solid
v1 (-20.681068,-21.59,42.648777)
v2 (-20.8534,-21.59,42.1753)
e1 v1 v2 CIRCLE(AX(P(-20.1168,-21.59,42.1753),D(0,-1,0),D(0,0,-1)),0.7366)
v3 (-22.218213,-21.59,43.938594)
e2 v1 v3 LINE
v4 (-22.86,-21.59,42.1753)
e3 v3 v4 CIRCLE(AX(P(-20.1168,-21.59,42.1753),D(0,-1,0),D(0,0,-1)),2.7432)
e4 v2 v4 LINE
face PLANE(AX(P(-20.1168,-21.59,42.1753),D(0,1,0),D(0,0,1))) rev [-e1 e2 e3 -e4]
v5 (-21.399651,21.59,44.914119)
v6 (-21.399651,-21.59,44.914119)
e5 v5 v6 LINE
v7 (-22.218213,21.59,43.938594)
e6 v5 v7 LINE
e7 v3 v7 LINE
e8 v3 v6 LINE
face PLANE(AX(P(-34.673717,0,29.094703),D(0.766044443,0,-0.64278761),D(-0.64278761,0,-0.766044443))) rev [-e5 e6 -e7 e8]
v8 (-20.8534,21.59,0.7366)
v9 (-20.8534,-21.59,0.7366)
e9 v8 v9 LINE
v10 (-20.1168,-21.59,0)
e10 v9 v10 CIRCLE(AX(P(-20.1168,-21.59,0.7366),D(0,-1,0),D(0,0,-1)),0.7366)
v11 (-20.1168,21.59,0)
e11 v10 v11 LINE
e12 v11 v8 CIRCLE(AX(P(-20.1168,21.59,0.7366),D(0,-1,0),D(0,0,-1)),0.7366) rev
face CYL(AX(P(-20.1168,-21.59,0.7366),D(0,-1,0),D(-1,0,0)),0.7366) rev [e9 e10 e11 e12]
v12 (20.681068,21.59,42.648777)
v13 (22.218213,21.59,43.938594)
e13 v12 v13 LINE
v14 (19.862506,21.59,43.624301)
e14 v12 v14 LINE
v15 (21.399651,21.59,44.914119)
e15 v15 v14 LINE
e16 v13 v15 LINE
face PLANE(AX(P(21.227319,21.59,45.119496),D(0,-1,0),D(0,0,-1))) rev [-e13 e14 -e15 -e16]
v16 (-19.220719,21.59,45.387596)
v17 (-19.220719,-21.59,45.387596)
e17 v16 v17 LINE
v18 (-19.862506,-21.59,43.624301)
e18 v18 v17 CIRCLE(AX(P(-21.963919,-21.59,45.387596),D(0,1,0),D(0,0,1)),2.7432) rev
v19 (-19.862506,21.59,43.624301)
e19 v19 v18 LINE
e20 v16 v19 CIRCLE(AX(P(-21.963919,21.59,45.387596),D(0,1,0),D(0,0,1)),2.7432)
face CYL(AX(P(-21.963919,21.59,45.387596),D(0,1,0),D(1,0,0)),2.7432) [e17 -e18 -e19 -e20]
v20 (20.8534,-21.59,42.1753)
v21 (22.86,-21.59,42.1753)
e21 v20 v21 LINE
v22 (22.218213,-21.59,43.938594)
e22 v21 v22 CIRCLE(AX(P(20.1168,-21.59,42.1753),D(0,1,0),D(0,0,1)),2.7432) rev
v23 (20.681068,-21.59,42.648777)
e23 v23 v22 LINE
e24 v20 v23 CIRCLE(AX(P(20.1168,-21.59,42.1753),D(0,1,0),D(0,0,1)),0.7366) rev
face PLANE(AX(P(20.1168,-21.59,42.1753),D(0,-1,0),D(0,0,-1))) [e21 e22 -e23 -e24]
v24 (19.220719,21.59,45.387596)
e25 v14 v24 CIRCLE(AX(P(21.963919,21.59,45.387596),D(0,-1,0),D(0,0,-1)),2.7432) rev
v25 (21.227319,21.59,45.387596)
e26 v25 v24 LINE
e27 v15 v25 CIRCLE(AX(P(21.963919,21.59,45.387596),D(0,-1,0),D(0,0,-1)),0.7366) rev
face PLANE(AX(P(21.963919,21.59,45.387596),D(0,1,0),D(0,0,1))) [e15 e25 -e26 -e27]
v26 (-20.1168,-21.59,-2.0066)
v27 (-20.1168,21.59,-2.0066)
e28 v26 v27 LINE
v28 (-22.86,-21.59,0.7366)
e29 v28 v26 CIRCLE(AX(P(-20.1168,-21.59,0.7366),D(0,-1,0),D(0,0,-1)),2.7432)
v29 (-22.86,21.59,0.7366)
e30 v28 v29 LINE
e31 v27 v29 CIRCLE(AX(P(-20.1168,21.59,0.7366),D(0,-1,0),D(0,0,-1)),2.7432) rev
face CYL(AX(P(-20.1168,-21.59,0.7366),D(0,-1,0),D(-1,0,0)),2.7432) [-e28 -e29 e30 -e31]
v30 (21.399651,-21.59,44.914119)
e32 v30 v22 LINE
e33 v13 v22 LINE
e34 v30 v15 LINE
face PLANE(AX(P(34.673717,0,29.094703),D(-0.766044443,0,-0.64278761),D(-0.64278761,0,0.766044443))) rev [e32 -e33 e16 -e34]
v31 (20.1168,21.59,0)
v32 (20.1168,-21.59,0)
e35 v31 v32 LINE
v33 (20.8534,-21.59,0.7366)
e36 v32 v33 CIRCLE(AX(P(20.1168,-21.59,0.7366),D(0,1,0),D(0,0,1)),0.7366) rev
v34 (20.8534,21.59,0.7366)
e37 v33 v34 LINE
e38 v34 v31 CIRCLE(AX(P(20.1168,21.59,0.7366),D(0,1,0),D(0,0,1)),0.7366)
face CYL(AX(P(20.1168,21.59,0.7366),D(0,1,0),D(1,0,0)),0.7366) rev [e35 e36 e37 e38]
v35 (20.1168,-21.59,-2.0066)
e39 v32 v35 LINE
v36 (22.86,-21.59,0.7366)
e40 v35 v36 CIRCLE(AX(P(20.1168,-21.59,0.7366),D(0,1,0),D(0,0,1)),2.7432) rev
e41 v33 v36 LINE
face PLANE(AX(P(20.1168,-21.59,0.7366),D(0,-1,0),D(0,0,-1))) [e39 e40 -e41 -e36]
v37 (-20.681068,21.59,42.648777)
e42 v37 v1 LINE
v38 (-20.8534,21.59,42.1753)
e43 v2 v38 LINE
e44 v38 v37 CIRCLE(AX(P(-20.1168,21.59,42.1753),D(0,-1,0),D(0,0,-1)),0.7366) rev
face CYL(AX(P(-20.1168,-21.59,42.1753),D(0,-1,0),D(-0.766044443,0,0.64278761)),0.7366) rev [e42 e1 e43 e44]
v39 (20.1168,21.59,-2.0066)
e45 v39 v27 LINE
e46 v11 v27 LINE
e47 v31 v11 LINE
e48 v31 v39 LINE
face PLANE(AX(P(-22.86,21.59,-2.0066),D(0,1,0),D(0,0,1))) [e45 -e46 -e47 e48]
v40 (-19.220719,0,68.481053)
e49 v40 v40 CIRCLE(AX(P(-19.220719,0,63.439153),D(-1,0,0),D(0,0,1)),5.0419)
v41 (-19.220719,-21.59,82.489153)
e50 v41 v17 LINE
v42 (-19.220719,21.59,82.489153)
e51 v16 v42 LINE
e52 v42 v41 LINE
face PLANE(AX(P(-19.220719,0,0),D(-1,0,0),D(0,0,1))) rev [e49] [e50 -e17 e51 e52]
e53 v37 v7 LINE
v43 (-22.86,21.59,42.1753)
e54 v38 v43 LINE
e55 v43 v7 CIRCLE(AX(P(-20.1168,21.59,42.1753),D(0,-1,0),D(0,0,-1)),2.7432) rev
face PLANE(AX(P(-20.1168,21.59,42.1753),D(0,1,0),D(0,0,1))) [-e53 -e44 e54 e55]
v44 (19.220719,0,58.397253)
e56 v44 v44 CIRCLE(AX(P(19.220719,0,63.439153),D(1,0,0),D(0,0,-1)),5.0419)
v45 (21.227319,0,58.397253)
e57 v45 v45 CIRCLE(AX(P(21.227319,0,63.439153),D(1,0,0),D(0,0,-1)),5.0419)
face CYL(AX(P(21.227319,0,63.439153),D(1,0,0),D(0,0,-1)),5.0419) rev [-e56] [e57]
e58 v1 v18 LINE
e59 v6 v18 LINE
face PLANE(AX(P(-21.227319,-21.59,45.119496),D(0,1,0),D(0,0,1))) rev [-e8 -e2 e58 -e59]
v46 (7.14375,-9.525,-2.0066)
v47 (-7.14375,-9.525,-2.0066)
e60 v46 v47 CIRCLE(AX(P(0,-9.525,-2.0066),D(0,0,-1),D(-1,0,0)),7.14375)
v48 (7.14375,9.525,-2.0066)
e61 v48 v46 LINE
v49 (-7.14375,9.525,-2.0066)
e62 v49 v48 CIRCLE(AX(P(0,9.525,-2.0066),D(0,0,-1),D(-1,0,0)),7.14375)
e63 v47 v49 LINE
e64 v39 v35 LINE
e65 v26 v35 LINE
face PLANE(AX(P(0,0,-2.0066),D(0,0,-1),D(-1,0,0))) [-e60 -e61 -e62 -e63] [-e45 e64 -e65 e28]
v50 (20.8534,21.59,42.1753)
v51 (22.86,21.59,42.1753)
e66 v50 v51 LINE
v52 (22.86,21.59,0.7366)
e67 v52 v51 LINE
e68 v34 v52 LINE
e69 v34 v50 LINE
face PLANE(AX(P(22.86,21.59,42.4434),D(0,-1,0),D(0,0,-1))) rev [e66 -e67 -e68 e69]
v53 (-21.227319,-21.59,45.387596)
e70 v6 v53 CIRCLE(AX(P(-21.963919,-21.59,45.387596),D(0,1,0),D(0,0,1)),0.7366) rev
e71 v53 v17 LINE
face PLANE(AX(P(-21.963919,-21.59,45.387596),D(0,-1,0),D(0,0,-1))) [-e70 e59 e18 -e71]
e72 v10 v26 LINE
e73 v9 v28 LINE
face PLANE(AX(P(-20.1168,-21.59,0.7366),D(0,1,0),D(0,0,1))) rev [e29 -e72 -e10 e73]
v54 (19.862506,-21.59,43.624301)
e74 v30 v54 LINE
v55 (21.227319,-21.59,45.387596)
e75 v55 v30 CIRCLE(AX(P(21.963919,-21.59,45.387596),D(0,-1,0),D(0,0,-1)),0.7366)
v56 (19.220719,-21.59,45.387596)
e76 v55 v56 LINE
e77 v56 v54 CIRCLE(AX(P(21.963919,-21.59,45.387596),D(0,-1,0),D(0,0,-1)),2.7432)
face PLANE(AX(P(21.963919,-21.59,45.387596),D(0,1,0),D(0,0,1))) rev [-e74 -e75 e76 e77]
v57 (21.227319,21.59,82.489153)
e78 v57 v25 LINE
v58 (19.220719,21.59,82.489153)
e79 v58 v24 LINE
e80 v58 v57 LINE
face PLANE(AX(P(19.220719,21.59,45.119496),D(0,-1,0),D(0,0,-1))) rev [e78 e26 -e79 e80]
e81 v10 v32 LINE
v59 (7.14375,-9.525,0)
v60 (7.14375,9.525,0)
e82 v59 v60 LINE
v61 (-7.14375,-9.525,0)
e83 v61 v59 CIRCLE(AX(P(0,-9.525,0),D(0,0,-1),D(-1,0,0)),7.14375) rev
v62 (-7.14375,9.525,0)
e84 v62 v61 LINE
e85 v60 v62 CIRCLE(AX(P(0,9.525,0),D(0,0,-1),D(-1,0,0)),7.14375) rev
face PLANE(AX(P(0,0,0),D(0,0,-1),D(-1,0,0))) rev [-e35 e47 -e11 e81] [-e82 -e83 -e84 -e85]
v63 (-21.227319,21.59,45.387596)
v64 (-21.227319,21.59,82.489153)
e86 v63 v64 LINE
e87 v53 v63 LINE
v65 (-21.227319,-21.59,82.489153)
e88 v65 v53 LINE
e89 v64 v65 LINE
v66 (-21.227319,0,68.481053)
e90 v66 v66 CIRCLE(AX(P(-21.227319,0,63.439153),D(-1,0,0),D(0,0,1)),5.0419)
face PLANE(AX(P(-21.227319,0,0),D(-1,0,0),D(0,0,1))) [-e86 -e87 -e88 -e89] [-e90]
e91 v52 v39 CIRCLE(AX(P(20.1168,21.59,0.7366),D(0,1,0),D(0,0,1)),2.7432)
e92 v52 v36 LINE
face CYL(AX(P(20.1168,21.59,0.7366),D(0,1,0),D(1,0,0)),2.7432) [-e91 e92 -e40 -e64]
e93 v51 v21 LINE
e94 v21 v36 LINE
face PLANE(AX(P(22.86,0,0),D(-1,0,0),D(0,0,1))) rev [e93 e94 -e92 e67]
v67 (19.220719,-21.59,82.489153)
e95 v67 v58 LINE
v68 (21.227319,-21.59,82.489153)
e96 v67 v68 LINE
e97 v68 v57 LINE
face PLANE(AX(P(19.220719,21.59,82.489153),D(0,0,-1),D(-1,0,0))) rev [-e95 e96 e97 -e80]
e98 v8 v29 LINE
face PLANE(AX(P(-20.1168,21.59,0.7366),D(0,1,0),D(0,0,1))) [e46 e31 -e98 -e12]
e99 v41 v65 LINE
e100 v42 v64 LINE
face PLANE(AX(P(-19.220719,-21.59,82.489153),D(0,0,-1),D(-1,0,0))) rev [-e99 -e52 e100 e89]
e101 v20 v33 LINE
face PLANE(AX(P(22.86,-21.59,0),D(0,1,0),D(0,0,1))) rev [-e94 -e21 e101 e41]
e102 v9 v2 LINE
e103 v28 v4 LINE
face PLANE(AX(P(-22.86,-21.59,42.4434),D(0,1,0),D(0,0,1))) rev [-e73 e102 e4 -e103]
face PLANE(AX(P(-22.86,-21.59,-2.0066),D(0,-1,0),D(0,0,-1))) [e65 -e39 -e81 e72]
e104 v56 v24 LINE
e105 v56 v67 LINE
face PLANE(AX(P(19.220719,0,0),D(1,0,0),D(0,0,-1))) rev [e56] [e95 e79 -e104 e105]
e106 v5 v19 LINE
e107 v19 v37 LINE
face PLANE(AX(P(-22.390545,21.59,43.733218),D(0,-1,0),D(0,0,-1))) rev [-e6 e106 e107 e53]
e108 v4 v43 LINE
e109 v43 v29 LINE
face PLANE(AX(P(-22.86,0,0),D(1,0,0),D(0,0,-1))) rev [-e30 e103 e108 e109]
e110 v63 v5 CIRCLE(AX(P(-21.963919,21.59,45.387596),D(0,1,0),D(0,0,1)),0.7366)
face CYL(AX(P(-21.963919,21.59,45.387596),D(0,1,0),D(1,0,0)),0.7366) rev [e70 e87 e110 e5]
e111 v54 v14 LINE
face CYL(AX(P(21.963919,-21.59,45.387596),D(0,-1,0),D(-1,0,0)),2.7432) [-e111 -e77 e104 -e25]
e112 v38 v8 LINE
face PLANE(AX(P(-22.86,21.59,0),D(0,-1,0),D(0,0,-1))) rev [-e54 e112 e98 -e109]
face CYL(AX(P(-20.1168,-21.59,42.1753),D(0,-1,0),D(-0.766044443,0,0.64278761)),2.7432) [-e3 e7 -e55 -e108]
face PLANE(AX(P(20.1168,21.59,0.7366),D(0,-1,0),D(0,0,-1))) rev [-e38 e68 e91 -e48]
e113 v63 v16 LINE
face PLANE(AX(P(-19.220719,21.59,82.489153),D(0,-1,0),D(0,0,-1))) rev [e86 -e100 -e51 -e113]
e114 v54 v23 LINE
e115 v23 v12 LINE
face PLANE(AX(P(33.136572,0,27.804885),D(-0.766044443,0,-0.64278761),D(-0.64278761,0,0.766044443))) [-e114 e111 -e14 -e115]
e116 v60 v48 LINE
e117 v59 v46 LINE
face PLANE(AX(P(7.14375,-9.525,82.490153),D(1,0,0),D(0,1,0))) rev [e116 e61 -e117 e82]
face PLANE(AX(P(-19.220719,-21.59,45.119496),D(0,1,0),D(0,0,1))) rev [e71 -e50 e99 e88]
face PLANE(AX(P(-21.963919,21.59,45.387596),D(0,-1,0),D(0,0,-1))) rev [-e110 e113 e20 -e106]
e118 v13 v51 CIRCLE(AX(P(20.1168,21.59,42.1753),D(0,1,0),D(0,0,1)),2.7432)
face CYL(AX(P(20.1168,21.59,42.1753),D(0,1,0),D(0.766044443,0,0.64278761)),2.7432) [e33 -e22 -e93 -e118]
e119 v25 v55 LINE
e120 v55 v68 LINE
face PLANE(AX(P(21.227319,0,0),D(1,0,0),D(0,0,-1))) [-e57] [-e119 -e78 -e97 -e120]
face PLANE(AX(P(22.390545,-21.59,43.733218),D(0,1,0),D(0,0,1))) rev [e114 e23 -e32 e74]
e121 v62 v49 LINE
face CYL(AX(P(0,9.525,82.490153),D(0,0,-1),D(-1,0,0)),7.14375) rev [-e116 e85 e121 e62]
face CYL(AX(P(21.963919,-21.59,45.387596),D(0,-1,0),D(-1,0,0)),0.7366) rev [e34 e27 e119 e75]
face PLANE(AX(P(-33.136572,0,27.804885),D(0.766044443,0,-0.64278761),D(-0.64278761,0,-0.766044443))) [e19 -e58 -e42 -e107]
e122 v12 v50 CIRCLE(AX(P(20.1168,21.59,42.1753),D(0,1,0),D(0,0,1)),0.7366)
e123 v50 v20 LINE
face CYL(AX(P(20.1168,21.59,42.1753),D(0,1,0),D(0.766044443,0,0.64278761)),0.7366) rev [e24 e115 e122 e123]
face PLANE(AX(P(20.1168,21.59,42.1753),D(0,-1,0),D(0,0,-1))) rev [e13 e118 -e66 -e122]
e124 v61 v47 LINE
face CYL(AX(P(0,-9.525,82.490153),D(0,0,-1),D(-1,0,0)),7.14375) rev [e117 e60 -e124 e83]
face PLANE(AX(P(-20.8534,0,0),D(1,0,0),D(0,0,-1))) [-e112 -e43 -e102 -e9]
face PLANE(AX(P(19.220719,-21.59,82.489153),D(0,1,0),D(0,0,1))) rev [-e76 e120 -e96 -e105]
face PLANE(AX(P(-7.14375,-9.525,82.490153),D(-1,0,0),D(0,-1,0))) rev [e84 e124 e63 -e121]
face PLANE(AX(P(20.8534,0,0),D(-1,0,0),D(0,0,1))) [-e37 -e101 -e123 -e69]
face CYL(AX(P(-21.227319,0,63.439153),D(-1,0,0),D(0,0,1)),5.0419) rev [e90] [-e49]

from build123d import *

# Parameters (mm, degrees)
SKETCH1_W                      = 45.72
SKETCH1_H                      = 43.18
BASE_FLANGE1_DEPTH             = 2.0066
EDGE_FLANGE1_STRIP_W           = 9.4996
EDGE_FLANGE1_STRIP_H           = 2.0066
EDGE_FLANGE1_STRIP_CUT_DEPTH   = 43.18
EDGE_FLANGE1_STRIP_2_W         = 9.4996
EDGE_FLANGE1_STRIP_2_H         = 2.0066
EDGE_FLANGE1_STRIP_CUT_2_DEPTH = 43.18
EDGE_FLANGE1_DEPTH             = 43.18
EDGE_FLANGE1_BEND_DEPTH        = 43.18
EDGE_FLANGE2_STRIP_CUT_DEPTH   = 43.18
EDGE_FLANGE2_STRIP_CUT_2_DEPTH = 43.18
EDGE_FLANGE2_DEPTH             = 43.18
EDGE_FLANGE2_BEND_DEPTH        = 43.18
EDGE_FLANGE4_STRIP_CUT_DEPTH   = 43.18
EDGE_FLANGE4_STRIP_CUT_2_DEPTH = 43.18
EDGE_FLANGE4_DEPTH             = 43.18
EDGE_FLANGE4_BEND_DEPTH        = 43.18
F_3_8_CLEARANCE_HOLE3_D        = 10.0838
F_3_8_CLEARANCE_HOLE3_DEPTH    = 25.4
F_3_8_CLEARANCE_HOLE3_TIP      = 3.029479155
F_3_8_CLEARANCE_HOLE4_D        = 10.0838
F_3_8_CLEARANCE_HOLE4_DEPTH    = 25.4
F_3_8_CLEARANCE_HOLE4_TIP      = 3.029479155
CUT_EXTRUDE1_REACH             = 92.157


# Sheet-metal steps are written as plain solids
with BuildPart() as part:
    # Sketch1 → Base-Flange1 (new body)
    with BuildSketch(Plane.XY):
        Rectangle(SKETCH1_W, SKETCH1_H)
    extrude(amount=-BASE_FLANGE1_DEPTH)

    # Edge-Flange1 strip (across the edge) → Edge-Flange1 strip cut (cut)
    with BuildSketch(Plane(origin=(22.86, -21.59, 0), x_dir=(-1, 0, 0), z_dir=(0, 1, 0))):
        with Locations((-2.0066, -1.0033)):
            Rectangle(EDGE_FLANGE1_STRIP_W, EDGE_FLANGE1_STRIP_H)
    extrude(amount=EDGE_FLANGE1_STRIP_CUT_DEPTH, mode=Mode.SUBTRACT)

    # Edge-Flange1 strip 2 (across the edge) → Edge-Flange1 strip cut 2 (cut)
    with BuildSketch(Plane(origin=(-22.86, 21.59, 0), x_dir=(1, 0, 0), z_dir=(0, -1, 0))):
        with Locations((-2.0066, -1.0033)):
            Rectangle(EDGE_FLANGE1_STRIP_2_W, EDGE_FLANGE1_STRIP_2_H)
    extrude(amount=EDGE_FLANGE1_STRIP_CUT_2_DEPTH, mode=Mode.SUBTRACT)

    # Edge-Flange1 section (across the edge) → Edge-Flange1 (add)
    with BuildSketch(Plane(origin=(22.86, -21.59, 0), x_dir=(-1, 0, 0), z_dir=(0, 1, 0))):
        with BuildLine():
            Line((0, 0.7366), (0, 42.4434))
            Line((0, 42.4434), (2.0066, 42.4434))
            Line((2.0066, 42.4434), (2.0066, 0.7366))
            ThreePointArc((2.0066, 0.7366), (2.222345145, 0.215745145), (2.7432, 0))
            Line((2.7432, 0), (2.7432, -2.0066))
            ThreePointArc((2.7432, -2.0066), (0.803464678, -1.203135322), (0, 0.7366))
        make_face()
    extrude(amount=EDGE_FLANGE1_DEPTH)

    # Edge-Flange1 section 2 (across the edge) → Edge-Flange1 bend (add)
    with BuildSketch(Plane(origin=(-22.86, 21.59, 0), x_dir=(1, 0, 0), z_dir=(0, -1, 0))):
        with BuildLine():
            Line((0, 0.7366), (0, 42.4434))
            Line((0, 42.4434), (2.0066, 42.4434))
            Line((2.0066, 42.4434), (2.0066, 0.7366))
            ThreePointArc((2.0066, 0.7366), (2.222345145, 0.215745145), (2.7432, 0))
            Line((2.7432, 0), (2.7432, -2.0066))
            ThreePointArc((2.7432, -2.0066), (0.803464678, -1.203135322), (0, 0.7366))
        make_face()
    extrude(amount=EDGE_FLANGE1_BEND_DEPTH)

    # Edge-Flange2 strip (across the edge) → Edge-Flange2 strip cut (cut)
    with BuildSketch(Plane(origin=(20.8534, -21.59, 42.4434), x_dir=(-0.7660444431189839, 0, -0.6427876096865324), z_dir=(0, 1, 0))):
        Polygon((-7.471038293, 5.781921296), (-1.364813116, -1.495194496), (0.172331663, -0.205376879), (-5.933893514, 7.071738913), align=None)
    extrude(amount=EDGE_FLANGE2_STRIP_CUT_DEPTH, mode=Mode.SUBTRACT)

    # Edge-Flange2 strip 2 (across the edge) → Edge-Flange2 strip cut 2 (cut)
    with BuildSketch(Plane(origin=(-20.8534, 21.59, 42.4434), x_dir=(0.7660444431189839, 0, -0.6427876096865324), z_dir=(0, -1, 0))):
        Polygon((-7.471038293, 5.781921296), (-1.364813116, -1.495194496), (0.172331663, -0.205376879), (-5.933893514, 7.071738913), align=None)
    extrude(amount=EDGE_FLANGE2_STRIP_CUT_2_DEPTH, mode=Mode.SUBTRACT)

    # Edge-Flange2 section (across the edge) → Edge-Flange2 (add)
    with BuildSketch(Plane(origin=(20.8534, -21.59, 42.4434), x_dir=(-0.7660444431189839, 0, -0.6427876096865324), z_dir=(0, 1, 0))):
        with BuildLine():
            Line((-2.0066, 0.268100475), (-2.0066, 1.809657328))
            Line((-2.0066, 1.809657328), (0, 1.809657328))
            Line((0, 1.809657328), (0, 0.268100475))
            ThreePointArc((0, 0.268100475), (0.044422416, 0.016168437), (0.172331663, -0.205376879))
            Line((0.172331663, -0.205376879), (-1.364813116, -1.495194496))
            ThreePointArc((-1.364813116, -1.495194496), (-1.841164797, -0.670129183), (-2.0066, 0.268100475))
        make_face()
    extrude(amount=EDGE_FLANGE2_DEPTH)

    # Edge-Flange2 section 2 (across the edge) → Edge-Flange2 bend (add)
    with BuildSketch(Plane(origin=(-20.8534, 21.59, 42.4434), x_dir=(0.7660444431189839, 0, -0.6427876096865324), z_dir=(0, -1, 0))):
        with BuildLine():
            Line((-2.0066, 0.268100475), (-2.0066, 1.809657328))
            Line((-2.0066, 1.809657328), (0, 1.809657328))
            Line((0, 1.809657328), (0, 0.268100475))
            ThreePointArc((0, 0.268100475), (0.044422416, 0.016168437), (0.172331663, -0.205376879))
            Line((0.172331663, -0.205376879), (-1.364813116, -1.495194496))
            ThreePointArc((-1.364813116, -1.495194496), (-1.841164797, -0.670129183), (-2.0066, 0.268100475))
        make_face()
    extrude(amount=EDGE_FLANGE2_BEND_DEPTH)

    # Edge-Flange4 strip (across the edge) → Edge-Flange4 strip cut (cut)
    with BuildSketch(Plane(origin=(-21.227319471, -21.59, 45.119495558), x_dir=(-1, 0, 0), z_dir=(0, 1, 0))):
        Polygon((-7.471038293, 5.781921296), (-1.364813116, -1.495194496), (0.172331663, -0.205376879), (-5.933893514, 7.071738913), align=None)
    extrude(amount=EDGE_FLANGE4_STRIP_CUT_DEPTH, mode=Mode.SUBTRACT)

    # Edge-Flange4 strip 2 (across the edge) → Edge-Flange4 strip cut 2 (cut)
    with BuildSketch(Plane(origin=(21.227319471, 21.59, 45.119495558), x_dir=(1, 0, 0), z_dir=(0, -1, 0))):
        Polygon((-7.471038293, 5.781921296), (-1.364813116, -1.495194496), (0.172331663, -0.205376879), (-5.933893514, 7.071738913), align=None)
    extrude(amount=EDGE_FLANGE4_STRIP_CUT_2_DEPTH, mode=Mode.SUBTRACT)

    # Edge-Flange4 section (across the edge) → Edge-Flange4 (add)
    with BuildSketch(Plane(origin=(-21.227319471, -21.59, 45.119495558), x_dir=(-1, 0, 0), z_dir=(0, 1, 0))):
        with BuildLine():
            Line((-2.0066, 0.268100475), (-2.0066, 37.369657328))
            Line((-2.0066, 37.369657328), (0, 37.369657328))
            Line((0, 37.369657328), (0, 0.268100475))
            ThreePointArc((0, 0.268100475), (0.044422416, 0.016168437), (0.172331663, -0.205376879))
            Line((0.172331663, -0.205376879), (-1.364813116, -1.495194496))
            ThreePointArc((-1.364813116, -1.495194496), (-1.841164797, -0.670129183), (-2.0066, 0.268100475))
        make_face()
    extrude(amount=EDGE_FLANGE4_DEPTH)

    # Edge-Flange4 section 2 (across the edge) → Edge-Flange4 bend (add)
    with BuildSketch(Plane(origin=(21.227319471, 21.59, 45.119495558), x_dir=(1, 0, 0), z_dir=(0, -1, 0))):
        with BuildLine():
            Line((-2.0066, 0.268100475), (-2.0066, 37.369657328))
            Line((-2.0066, 37.369657328), (0, 37.369657328))
            Line((0, 37.369657328), (0, 0.268100475))
            ThreePointArc((0, 0.268100475), (0.044422416, 0.016168437), (0.172331663, -0.205376879))
            Line((0.172331663, -0.205376879), (-1.364813116, -1.495194496))
            ThreePointArc((-1.364813116, -1.495194496), (-1.841164797, -0.670129183), (-2.0066, 0.268100475))
        make_face()
    extrude(amount=EDGE_FLANGE4_BEND_DEPTH)

    # 3/8 Clearance Hole3
    with Locations(Plane.ZY.offset(21.227319471)):
        with Locations((63.439152886, 0)):
            Hole(F_3_8_CLEARANCE_HOLE3_D / 2, depth=F_3_8_CLEARANCE_HOLE3_DEPTH)
            with Locations((0, 0, -(F_3_8_CLEARANCE_HOLE3_DEPTH + F_3_8_CLEARANCE_HOLE3_TIP / 2))):  # 118° drill point
                Cone(0, F_3_8_CLEARANCE_HOLE3_D / 2, F_3_8_CLEARANCE_HOLE3_TIP, mode=Mode.SUBTRACT)

    # 3/8 Clearance Hole4
    with Locations(Plane(origin=(21.227319471, 0, 0), x_dir=(0, 0, -1), z_dir=(1, 0, 0))):
        with Locations((-63.439152886, 0)):
            Hole(F_3_8_CLEARANCE_HOLE4_D / 2, depth=F_3_8_CLEARANCE_HOLE4_DEPTH)
            with Locations((0, 0, -(F_3_8_CLEARANCE_HOLE4_DEPTH + F_3_8_CLEARANCE_HOLE4_TIP / 2))):  # 118° drill point
                Cone(0, F_3_8_CLEARANCE_HOLE4_D / 2, F_3_8_CLEARANCE_HOLE4_TIP, mode=Mode.SUBTRACT)

    # Sketch38 → Cut-Extrude1 (cut, up to next)
    with BuildSketch(Plane(origin=(0, 0, -2.0066), x_dir=(-1, 0, 0), z_dir=(0, 0, -1)), mode=Mode.PRIVATE) as cut_extrude1_sk1:
        with BuildLine():
            Line((-7.14375, -9.525), (-7.14375, 9.525))
            ThreePointArc((-7.14375, 9.525), (0, 16.66875), (7.14375, 9.525))
            Line((7.14375, 9.525), (7.14375, -9.525))
            ThreePointArc((7.14375, -9.525), (0, -16.66875), (-7.14375, -9.525))
        make_face()
    cut_extrude1_tool1 = extrude(cut_extrude1_sk1.sketch, amount=-CUT_EXTRUDE1_REACH, mode=Mode.PRIVATE) & part.part
    add(cut_extrude1_tool1.solids().sort_by_distance((0, 0, -2.0066))[0], mode=Mode.SUBTRACT)


solid = part.part
